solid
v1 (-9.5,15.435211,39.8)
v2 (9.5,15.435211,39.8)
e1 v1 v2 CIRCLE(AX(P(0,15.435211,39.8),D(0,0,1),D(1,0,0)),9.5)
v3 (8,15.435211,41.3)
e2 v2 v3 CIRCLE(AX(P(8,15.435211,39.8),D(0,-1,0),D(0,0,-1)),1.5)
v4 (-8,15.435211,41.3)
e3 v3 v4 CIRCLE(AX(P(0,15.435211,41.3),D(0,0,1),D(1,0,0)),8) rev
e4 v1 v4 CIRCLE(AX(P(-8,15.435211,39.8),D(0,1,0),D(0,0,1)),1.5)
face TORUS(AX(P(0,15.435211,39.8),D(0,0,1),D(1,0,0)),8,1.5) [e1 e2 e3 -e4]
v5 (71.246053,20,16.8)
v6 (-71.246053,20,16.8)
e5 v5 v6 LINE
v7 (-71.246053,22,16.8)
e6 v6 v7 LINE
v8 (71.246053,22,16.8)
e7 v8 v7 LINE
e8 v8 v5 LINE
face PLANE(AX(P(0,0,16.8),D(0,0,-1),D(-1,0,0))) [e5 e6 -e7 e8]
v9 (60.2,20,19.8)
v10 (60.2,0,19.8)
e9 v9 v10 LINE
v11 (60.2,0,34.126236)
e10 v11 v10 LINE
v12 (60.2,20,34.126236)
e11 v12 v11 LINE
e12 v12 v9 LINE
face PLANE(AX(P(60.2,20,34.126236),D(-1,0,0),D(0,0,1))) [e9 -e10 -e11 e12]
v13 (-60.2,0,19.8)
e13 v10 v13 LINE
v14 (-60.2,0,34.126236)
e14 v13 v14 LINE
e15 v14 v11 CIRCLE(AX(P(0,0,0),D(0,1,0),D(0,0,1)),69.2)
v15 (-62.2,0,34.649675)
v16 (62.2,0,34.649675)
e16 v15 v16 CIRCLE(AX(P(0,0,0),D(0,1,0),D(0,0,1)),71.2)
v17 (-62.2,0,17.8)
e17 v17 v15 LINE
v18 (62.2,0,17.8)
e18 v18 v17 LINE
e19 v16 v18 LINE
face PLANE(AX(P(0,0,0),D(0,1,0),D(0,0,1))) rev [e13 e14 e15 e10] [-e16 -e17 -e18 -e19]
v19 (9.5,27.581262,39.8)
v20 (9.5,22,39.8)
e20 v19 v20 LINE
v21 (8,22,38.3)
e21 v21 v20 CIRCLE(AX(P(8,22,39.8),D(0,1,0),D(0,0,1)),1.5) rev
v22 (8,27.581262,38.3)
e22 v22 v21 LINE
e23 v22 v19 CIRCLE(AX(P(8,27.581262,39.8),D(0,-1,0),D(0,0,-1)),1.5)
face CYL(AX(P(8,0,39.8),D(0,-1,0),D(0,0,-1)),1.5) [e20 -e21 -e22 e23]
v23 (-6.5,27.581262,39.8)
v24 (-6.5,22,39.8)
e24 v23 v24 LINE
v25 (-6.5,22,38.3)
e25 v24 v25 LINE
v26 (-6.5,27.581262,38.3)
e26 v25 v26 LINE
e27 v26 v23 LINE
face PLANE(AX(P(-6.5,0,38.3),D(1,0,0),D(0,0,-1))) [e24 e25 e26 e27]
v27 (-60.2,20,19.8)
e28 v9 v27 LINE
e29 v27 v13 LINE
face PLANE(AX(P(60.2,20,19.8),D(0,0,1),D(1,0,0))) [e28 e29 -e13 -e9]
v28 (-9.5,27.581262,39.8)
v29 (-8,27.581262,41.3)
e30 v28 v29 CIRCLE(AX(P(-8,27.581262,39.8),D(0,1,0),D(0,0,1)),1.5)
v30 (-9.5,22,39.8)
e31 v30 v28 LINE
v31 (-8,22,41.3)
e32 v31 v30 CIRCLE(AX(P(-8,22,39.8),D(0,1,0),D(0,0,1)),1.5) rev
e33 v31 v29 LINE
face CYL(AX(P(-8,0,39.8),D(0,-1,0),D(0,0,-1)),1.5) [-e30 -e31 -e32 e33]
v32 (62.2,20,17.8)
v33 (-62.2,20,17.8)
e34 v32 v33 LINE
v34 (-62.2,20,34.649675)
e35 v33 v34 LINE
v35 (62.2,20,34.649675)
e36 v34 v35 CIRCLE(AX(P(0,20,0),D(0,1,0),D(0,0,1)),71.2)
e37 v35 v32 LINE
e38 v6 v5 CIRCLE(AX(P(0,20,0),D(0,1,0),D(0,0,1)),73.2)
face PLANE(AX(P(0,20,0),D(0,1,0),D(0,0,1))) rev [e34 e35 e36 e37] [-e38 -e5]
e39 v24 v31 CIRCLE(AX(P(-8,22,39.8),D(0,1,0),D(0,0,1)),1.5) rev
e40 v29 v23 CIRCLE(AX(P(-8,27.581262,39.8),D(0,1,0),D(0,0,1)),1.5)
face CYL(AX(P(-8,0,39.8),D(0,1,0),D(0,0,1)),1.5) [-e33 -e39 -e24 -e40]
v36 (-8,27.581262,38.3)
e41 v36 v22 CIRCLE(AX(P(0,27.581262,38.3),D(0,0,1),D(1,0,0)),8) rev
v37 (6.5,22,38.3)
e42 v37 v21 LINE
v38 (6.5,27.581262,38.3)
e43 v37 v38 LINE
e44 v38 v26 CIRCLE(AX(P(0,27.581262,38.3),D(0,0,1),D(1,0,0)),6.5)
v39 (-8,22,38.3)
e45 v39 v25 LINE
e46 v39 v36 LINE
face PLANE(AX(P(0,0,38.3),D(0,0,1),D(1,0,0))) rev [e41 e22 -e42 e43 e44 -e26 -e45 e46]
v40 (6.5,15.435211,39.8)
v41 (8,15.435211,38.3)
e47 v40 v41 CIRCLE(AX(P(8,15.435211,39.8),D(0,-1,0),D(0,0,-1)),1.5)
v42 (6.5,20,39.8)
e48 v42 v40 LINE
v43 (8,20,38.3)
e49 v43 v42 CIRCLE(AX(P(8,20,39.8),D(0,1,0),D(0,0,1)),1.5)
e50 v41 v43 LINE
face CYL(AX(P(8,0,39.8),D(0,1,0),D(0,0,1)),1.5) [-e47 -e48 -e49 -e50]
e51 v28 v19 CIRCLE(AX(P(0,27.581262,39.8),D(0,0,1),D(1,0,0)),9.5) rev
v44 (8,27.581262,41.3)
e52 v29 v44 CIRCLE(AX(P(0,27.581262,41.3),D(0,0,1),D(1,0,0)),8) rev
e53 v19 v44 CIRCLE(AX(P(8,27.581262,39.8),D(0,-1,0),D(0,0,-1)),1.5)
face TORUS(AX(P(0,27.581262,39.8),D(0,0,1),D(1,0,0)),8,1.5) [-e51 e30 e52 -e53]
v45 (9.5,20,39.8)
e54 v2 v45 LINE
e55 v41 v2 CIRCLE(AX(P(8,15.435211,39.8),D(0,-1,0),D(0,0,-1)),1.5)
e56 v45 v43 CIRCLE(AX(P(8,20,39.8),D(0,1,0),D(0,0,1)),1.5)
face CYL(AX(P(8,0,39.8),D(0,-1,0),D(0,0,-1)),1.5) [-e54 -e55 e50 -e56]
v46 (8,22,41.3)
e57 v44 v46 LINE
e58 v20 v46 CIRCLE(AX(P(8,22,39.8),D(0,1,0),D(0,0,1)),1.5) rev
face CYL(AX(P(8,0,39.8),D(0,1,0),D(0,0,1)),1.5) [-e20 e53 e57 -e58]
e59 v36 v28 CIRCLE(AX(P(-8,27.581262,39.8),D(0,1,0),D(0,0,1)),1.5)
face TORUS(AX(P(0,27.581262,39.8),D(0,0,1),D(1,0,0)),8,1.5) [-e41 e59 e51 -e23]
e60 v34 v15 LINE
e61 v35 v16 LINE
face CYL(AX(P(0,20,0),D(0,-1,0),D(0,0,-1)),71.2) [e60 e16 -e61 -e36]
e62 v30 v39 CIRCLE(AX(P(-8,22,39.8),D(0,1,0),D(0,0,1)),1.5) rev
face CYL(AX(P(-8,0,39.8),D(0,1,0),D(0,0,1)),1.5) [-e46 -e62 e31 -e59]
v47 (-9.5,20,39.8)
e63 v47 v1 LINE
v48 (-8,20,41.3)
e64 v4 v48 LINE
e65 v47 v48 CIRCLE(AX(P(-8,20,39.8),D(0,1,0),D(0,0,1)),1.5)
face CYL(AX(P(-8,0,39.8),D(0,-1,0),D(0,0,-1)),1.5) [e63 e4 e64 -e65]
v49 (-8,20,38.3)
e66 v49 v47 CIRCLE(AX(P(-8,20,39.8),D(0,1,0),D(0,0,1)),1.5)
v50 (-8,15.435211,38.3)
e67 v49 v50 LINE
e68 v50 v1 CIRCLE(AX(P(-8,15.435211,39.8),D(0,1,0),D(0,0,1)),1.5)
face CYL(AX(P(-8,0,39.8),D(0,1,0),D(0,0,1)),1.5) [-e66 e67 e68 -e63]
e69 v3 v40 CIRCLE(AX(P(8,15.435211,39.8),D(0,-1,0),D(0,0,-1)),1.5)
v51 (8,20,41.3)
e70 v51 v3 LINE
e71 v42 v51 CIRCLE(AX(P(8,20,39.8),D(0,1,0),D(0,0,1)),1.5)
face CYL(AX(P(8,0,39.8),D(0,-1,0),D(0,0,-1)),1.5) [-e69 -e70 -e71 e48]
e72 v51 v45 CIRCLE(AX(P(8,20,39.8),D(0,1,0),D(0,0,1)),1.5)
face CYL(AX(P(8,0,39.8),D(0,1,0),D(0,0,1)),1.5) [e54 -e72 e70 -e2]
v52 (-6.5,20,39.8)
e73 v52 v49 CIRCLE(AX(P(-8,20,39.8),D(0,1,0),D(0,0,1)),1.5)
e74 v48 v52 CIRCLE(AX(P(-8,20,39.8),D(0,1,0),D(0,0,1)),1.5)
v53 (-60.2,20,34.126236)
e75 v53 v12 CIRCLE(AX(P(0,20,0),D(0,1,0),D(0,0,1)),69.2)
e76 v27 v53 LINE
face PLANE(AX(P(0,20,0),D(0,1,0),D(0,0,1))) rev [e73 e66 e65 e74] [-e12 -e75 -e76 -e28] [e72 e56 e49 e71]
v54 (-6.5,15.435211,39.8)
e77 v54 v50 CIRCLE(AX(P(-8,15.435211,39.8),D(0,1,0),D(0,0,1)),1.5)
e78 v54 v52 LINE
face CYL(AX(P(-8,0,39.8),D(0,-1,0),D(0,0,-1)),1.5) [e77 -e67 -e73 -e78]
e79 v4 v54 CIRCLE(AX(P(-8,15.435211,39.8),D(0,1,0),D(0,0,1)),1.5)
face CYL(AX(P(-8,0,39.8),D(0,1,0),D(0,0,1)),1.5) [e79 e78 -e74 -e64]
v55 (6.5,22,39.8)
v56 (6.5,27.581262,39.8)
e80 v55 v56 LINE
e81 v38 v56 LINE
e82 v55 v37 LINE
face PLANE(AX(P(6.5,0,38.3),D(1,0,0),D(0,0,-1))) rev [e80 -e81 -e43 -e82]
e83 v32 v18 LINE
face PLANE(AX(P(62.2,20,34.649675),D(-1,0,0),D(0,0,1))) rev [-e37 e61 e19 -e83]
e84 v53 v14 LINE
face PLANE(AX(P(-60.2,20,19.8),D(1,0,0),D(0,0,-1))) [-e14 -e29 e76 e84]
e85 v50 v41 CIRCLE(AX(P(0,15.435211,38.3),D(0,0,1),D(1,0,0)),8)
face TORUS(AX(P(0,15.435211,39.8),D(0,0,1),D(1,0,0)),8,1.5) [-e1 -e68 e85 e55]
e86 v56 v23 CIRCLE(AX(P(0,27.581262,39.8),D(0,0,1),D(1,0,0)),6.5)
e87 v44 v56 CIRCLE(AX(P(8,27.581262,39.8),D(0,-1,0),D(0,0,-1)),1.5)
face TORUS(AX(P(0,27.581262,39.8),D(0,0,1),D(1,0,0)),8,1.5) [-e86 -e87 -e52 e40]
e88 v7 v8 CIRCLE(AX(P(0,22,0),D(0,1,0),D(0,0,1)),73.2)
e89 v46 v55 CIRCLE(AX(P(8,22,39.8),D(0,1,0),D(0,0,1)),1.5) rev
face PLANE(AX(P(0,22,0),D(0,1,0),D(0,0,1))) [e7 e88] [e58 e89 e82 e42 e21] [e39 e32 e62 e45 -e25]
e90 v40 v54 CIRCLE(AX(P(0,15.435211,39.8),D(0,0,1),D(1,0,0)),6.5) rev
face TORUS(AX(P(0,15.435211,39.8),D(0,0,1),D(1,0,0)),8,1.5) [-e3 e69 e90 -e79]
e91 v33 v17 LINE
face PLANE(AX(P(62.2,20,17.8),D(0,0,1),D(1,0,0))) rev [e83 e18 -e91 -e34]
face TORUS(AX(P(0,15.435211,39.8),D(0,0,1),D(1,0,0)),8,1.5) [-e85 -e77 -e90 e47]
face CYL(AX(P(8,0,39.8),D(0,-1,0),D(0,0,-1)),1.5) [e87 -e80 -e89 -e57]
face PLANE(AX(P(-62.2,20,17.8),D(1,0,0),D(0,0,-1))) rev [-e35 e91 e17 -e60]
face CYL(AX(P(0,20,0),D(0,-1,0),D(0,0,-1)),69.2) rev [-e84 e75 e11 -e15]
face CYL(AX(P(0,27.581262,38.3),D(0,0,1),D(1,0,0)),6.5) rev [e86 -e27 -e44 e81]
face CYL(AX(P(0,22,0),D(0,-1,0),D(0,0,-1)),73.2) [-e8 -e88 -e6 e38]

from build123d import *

# Parameters (mm, degrees)
BOSS_EXTRUDE1_DEPTH      = 20
BOSS_EXTRUDE1_2_DEPTH    = 20
SKETCH2_R                = 73.2
BOSS_EXTRUDE2_DEPTH      = 2
BODY_DELETE_KEEP_1_DEPTH = 22
BOSS_EXTRUDE3_DEPTH      = 1.5
BOSS_EXTRUDE3_DEPTH_BACK = 1.5
FILLET2_R                = 1.5


# Read off the part's stored shape, not the designer's step: Body-Delete/Keep 1
with BuildPart() as part:
    # Sketch1 → Boss-Extrude1 (new body)
    with BuildSketch(Plane(origin=(0, 0, 0), x_dir=(1, 0, 0), z_dir=(0, 1, 0))):
        with BuildLine():
            Line((62.2, -17.8), (-62.2, -17.8))
            Line((-62.2, -17.8), (-62.2, -34.649675323))
            ThreePointArc((-62.2, -34.649675323), (0, -71.2), (62.2, -34.649675323))
            Line((62.2, -34.649675323), (62.2, -17.8))
        make_face()
        with BuildLine():
            Line((60.2, -34.126236241), (60.2, -19.8))
            Line((60.2, -19.8), (-60.2, -19.8))
            Line((-60.2, -19.8), (-60.2, -34.126236241))
            ThreePointArc((-60.2, -34.126236241), (0, -69.2), (60.2, -34.126236241))
        make_face(mode=Mode.SUBTRACT)
    extrude(amount=BOSS_EXTRUDE1_DEPTH)

    # Sketch2 → Boss-Extrude2 (add)
    with BuildSketch(Plane(origin=(0, 20, 0), x_dir=(1, 0, 0), z_dir=(0, 1, 0))):
        with Locations(Location((0, 0, 0), (0, 0, 270))):
            Circle(SKETCH2_R)
    extrude(amount=BOSS_EXTRUDE2_DEPTH)


with BuildPart() as body_2:
    # Sketch1 → Boss-Extrude1 2 (new body)
    with BuildSketch(Plane(origin=(0, 0, 0), x_dir=(1, 0, 0), z_dir=(0, 1, 0))):
        with BuildLine():
            Line((-62.2, -15.8), (62.2, -15.8))
            Line((62.2, -15.8), (62.2, 34.649675323))
            ThreePointArc((62.2, 34.649675323), (0, 71.2), (-62.2, 34.649675323))
            Line((-62.2, 34.649675323), (-62.2, -15.8))
        make_face()
        with BuildLine():
            Line((-60.2, 34.126236241), (-60.2, -13.8))
            Line((-60.2, -13.8), (60.2, -13.8))
            Line((60.2, -13.8), (60.2, 34.126236241))
            ThreePointArc((60.2, 34.126236241), (0, 69.2), (-60.2, 34.126236241))
        make_face(mode=Mode.SUBTRACT)
    extrude(amount=BOSS_EXTRUDE1_2_DEPTH)


with BuildPart() as body_3:
    # Split1: the piece on the far side of the plane
    add(part.part)
    split(bisect_by=Plane(origin=(0, 0, 16.8), x_dir=(-1, 0, 0), z_dir=(0, 0, -1)), keep=Keep.BOTTOM)

    # Sketch4 → Boss-Extrude3 (add, two sides: drawn at the far end of the back side and taken through both)
    with BuildSketch(Plane.XY.offset(39.8).offset(-BOSS_EXTRUDE3_DEPTH_BACK)):
        with BuildLine():
            Line((-9.5, 15.435211288), (-9.5, 27.581262171))
            ThreePointArc((-9.5, 27.581262171), (0, 37.081262171), (9.5, 27.581262171))
            Line((9.5, 27.581262171), (9.5, 15.435211288))
            ThreePointArc((9.5, 15.435211288), (0, 5.935211288), (-9.5, 15.435211288))
        make_face()
        with BuildLine():
            ThreePointArc((-6.5, 15.435211288), (0, 8.935211288), (6.5, 15.435211288))
            Line((6.5, 15.435211288), (6.5, 27.581262171))
            ThreePointArc((6.5, 27.581262171), (0, 34.081262171), (-6.5, 27.581262171))
            Line((-6.5, 27.581262171), (-6.5, 15.435211288))
        make_face(mode=Mode.SUBTRACT)
    extrude(amount=BOSS_EXTRUDE3_DEPTH + BOSS_EXTRUDE3_DEPTH_BACK)

    # Fillet2
    fillet2_edges = [body_3.edges().sort_by_distance(p)[0] for p in [
        (-9.5, 17.717605644, 41.3),
        (0, 5.935211288, 41.3),
        (9.5, 17.717605644, 41.3),
        (-6.5, 17.717605644, 41.3),
        (0, 8.935211288, 41.3),
        (6.5, 17.717605644, 41.3),
        (9.5, 17.717605644, 38.3),
        (6.5, 17.717605644, 38.3),
        (0, 8.935211288, 38.3),
        (-6.5, 17.717605644, 38.3),
        (0, 5.935211288, 38.3),
        (-9.5, 17.717605644, 38.3),
        (9.5, 24.790631086, 38.3),
        (0, 37.081262171, 38.3),
        (-9.5, 24.790631086, 38.3),
        (-9.5, 24.790631086, 41.3),
        (9.5, 24.790631086, 41.3),
        (6.5, 24.790631086, 41.3),
        (-6.5, 24.790631086, 41.3),
        (0, 34.081262171, 41.3),
        (0, 37.081262171, 41.3),
    ]]
    fillet(fillet2_edges, radius=FILLET2_R - 0.0001)  # a hair under: the kernel refuses the full size


with BuildPart() as part_1:
    add(part.part)

    # Split1
    split(bisect_by=Plane(origin=(0, 0, 16.8), x_dir=(-1, 0, 0), z_dir=(0, 0, -1)), keep=Keep.TOP)


with BuildPart() as body_delete_keep_1_tool:
    # Body-Delete/Keep 1 outline → Body-Delete/Keep 1 (new body)
    with BuildSketch(Plane(origin=(0, 0, 0), x_dir=(1, 0, 0), z_dir=(0, 1, 0))):
        with BuildLine():
            ThreePointArc((71.246052522, -16.8), (0, 73.2), (-71.246052522, -16.8))
            Line((-71.246052522, -16.8), (71.246052522, -16.8))
        make_face()
    extrude(amount=BODY_DELETE_KEEP_1_DEPTH)


with BuildPart() as part_2:
    add(part_1.part)

    # Body-Delete/Keep 1: cut by body_delete_keep_1_tool
    add(body_delete_keep_1_tool.part, mode=Mode.SUBTRACT)


with BuildPart() as body_2_1:
    add(body_2.part)

    # Body-Delete/Keep 1: cut by body_delete_keep_1_tool
    add(body_delete_keep_1_tool.part, mode=Mode.SUBTRACT)


solid = body_3.part
